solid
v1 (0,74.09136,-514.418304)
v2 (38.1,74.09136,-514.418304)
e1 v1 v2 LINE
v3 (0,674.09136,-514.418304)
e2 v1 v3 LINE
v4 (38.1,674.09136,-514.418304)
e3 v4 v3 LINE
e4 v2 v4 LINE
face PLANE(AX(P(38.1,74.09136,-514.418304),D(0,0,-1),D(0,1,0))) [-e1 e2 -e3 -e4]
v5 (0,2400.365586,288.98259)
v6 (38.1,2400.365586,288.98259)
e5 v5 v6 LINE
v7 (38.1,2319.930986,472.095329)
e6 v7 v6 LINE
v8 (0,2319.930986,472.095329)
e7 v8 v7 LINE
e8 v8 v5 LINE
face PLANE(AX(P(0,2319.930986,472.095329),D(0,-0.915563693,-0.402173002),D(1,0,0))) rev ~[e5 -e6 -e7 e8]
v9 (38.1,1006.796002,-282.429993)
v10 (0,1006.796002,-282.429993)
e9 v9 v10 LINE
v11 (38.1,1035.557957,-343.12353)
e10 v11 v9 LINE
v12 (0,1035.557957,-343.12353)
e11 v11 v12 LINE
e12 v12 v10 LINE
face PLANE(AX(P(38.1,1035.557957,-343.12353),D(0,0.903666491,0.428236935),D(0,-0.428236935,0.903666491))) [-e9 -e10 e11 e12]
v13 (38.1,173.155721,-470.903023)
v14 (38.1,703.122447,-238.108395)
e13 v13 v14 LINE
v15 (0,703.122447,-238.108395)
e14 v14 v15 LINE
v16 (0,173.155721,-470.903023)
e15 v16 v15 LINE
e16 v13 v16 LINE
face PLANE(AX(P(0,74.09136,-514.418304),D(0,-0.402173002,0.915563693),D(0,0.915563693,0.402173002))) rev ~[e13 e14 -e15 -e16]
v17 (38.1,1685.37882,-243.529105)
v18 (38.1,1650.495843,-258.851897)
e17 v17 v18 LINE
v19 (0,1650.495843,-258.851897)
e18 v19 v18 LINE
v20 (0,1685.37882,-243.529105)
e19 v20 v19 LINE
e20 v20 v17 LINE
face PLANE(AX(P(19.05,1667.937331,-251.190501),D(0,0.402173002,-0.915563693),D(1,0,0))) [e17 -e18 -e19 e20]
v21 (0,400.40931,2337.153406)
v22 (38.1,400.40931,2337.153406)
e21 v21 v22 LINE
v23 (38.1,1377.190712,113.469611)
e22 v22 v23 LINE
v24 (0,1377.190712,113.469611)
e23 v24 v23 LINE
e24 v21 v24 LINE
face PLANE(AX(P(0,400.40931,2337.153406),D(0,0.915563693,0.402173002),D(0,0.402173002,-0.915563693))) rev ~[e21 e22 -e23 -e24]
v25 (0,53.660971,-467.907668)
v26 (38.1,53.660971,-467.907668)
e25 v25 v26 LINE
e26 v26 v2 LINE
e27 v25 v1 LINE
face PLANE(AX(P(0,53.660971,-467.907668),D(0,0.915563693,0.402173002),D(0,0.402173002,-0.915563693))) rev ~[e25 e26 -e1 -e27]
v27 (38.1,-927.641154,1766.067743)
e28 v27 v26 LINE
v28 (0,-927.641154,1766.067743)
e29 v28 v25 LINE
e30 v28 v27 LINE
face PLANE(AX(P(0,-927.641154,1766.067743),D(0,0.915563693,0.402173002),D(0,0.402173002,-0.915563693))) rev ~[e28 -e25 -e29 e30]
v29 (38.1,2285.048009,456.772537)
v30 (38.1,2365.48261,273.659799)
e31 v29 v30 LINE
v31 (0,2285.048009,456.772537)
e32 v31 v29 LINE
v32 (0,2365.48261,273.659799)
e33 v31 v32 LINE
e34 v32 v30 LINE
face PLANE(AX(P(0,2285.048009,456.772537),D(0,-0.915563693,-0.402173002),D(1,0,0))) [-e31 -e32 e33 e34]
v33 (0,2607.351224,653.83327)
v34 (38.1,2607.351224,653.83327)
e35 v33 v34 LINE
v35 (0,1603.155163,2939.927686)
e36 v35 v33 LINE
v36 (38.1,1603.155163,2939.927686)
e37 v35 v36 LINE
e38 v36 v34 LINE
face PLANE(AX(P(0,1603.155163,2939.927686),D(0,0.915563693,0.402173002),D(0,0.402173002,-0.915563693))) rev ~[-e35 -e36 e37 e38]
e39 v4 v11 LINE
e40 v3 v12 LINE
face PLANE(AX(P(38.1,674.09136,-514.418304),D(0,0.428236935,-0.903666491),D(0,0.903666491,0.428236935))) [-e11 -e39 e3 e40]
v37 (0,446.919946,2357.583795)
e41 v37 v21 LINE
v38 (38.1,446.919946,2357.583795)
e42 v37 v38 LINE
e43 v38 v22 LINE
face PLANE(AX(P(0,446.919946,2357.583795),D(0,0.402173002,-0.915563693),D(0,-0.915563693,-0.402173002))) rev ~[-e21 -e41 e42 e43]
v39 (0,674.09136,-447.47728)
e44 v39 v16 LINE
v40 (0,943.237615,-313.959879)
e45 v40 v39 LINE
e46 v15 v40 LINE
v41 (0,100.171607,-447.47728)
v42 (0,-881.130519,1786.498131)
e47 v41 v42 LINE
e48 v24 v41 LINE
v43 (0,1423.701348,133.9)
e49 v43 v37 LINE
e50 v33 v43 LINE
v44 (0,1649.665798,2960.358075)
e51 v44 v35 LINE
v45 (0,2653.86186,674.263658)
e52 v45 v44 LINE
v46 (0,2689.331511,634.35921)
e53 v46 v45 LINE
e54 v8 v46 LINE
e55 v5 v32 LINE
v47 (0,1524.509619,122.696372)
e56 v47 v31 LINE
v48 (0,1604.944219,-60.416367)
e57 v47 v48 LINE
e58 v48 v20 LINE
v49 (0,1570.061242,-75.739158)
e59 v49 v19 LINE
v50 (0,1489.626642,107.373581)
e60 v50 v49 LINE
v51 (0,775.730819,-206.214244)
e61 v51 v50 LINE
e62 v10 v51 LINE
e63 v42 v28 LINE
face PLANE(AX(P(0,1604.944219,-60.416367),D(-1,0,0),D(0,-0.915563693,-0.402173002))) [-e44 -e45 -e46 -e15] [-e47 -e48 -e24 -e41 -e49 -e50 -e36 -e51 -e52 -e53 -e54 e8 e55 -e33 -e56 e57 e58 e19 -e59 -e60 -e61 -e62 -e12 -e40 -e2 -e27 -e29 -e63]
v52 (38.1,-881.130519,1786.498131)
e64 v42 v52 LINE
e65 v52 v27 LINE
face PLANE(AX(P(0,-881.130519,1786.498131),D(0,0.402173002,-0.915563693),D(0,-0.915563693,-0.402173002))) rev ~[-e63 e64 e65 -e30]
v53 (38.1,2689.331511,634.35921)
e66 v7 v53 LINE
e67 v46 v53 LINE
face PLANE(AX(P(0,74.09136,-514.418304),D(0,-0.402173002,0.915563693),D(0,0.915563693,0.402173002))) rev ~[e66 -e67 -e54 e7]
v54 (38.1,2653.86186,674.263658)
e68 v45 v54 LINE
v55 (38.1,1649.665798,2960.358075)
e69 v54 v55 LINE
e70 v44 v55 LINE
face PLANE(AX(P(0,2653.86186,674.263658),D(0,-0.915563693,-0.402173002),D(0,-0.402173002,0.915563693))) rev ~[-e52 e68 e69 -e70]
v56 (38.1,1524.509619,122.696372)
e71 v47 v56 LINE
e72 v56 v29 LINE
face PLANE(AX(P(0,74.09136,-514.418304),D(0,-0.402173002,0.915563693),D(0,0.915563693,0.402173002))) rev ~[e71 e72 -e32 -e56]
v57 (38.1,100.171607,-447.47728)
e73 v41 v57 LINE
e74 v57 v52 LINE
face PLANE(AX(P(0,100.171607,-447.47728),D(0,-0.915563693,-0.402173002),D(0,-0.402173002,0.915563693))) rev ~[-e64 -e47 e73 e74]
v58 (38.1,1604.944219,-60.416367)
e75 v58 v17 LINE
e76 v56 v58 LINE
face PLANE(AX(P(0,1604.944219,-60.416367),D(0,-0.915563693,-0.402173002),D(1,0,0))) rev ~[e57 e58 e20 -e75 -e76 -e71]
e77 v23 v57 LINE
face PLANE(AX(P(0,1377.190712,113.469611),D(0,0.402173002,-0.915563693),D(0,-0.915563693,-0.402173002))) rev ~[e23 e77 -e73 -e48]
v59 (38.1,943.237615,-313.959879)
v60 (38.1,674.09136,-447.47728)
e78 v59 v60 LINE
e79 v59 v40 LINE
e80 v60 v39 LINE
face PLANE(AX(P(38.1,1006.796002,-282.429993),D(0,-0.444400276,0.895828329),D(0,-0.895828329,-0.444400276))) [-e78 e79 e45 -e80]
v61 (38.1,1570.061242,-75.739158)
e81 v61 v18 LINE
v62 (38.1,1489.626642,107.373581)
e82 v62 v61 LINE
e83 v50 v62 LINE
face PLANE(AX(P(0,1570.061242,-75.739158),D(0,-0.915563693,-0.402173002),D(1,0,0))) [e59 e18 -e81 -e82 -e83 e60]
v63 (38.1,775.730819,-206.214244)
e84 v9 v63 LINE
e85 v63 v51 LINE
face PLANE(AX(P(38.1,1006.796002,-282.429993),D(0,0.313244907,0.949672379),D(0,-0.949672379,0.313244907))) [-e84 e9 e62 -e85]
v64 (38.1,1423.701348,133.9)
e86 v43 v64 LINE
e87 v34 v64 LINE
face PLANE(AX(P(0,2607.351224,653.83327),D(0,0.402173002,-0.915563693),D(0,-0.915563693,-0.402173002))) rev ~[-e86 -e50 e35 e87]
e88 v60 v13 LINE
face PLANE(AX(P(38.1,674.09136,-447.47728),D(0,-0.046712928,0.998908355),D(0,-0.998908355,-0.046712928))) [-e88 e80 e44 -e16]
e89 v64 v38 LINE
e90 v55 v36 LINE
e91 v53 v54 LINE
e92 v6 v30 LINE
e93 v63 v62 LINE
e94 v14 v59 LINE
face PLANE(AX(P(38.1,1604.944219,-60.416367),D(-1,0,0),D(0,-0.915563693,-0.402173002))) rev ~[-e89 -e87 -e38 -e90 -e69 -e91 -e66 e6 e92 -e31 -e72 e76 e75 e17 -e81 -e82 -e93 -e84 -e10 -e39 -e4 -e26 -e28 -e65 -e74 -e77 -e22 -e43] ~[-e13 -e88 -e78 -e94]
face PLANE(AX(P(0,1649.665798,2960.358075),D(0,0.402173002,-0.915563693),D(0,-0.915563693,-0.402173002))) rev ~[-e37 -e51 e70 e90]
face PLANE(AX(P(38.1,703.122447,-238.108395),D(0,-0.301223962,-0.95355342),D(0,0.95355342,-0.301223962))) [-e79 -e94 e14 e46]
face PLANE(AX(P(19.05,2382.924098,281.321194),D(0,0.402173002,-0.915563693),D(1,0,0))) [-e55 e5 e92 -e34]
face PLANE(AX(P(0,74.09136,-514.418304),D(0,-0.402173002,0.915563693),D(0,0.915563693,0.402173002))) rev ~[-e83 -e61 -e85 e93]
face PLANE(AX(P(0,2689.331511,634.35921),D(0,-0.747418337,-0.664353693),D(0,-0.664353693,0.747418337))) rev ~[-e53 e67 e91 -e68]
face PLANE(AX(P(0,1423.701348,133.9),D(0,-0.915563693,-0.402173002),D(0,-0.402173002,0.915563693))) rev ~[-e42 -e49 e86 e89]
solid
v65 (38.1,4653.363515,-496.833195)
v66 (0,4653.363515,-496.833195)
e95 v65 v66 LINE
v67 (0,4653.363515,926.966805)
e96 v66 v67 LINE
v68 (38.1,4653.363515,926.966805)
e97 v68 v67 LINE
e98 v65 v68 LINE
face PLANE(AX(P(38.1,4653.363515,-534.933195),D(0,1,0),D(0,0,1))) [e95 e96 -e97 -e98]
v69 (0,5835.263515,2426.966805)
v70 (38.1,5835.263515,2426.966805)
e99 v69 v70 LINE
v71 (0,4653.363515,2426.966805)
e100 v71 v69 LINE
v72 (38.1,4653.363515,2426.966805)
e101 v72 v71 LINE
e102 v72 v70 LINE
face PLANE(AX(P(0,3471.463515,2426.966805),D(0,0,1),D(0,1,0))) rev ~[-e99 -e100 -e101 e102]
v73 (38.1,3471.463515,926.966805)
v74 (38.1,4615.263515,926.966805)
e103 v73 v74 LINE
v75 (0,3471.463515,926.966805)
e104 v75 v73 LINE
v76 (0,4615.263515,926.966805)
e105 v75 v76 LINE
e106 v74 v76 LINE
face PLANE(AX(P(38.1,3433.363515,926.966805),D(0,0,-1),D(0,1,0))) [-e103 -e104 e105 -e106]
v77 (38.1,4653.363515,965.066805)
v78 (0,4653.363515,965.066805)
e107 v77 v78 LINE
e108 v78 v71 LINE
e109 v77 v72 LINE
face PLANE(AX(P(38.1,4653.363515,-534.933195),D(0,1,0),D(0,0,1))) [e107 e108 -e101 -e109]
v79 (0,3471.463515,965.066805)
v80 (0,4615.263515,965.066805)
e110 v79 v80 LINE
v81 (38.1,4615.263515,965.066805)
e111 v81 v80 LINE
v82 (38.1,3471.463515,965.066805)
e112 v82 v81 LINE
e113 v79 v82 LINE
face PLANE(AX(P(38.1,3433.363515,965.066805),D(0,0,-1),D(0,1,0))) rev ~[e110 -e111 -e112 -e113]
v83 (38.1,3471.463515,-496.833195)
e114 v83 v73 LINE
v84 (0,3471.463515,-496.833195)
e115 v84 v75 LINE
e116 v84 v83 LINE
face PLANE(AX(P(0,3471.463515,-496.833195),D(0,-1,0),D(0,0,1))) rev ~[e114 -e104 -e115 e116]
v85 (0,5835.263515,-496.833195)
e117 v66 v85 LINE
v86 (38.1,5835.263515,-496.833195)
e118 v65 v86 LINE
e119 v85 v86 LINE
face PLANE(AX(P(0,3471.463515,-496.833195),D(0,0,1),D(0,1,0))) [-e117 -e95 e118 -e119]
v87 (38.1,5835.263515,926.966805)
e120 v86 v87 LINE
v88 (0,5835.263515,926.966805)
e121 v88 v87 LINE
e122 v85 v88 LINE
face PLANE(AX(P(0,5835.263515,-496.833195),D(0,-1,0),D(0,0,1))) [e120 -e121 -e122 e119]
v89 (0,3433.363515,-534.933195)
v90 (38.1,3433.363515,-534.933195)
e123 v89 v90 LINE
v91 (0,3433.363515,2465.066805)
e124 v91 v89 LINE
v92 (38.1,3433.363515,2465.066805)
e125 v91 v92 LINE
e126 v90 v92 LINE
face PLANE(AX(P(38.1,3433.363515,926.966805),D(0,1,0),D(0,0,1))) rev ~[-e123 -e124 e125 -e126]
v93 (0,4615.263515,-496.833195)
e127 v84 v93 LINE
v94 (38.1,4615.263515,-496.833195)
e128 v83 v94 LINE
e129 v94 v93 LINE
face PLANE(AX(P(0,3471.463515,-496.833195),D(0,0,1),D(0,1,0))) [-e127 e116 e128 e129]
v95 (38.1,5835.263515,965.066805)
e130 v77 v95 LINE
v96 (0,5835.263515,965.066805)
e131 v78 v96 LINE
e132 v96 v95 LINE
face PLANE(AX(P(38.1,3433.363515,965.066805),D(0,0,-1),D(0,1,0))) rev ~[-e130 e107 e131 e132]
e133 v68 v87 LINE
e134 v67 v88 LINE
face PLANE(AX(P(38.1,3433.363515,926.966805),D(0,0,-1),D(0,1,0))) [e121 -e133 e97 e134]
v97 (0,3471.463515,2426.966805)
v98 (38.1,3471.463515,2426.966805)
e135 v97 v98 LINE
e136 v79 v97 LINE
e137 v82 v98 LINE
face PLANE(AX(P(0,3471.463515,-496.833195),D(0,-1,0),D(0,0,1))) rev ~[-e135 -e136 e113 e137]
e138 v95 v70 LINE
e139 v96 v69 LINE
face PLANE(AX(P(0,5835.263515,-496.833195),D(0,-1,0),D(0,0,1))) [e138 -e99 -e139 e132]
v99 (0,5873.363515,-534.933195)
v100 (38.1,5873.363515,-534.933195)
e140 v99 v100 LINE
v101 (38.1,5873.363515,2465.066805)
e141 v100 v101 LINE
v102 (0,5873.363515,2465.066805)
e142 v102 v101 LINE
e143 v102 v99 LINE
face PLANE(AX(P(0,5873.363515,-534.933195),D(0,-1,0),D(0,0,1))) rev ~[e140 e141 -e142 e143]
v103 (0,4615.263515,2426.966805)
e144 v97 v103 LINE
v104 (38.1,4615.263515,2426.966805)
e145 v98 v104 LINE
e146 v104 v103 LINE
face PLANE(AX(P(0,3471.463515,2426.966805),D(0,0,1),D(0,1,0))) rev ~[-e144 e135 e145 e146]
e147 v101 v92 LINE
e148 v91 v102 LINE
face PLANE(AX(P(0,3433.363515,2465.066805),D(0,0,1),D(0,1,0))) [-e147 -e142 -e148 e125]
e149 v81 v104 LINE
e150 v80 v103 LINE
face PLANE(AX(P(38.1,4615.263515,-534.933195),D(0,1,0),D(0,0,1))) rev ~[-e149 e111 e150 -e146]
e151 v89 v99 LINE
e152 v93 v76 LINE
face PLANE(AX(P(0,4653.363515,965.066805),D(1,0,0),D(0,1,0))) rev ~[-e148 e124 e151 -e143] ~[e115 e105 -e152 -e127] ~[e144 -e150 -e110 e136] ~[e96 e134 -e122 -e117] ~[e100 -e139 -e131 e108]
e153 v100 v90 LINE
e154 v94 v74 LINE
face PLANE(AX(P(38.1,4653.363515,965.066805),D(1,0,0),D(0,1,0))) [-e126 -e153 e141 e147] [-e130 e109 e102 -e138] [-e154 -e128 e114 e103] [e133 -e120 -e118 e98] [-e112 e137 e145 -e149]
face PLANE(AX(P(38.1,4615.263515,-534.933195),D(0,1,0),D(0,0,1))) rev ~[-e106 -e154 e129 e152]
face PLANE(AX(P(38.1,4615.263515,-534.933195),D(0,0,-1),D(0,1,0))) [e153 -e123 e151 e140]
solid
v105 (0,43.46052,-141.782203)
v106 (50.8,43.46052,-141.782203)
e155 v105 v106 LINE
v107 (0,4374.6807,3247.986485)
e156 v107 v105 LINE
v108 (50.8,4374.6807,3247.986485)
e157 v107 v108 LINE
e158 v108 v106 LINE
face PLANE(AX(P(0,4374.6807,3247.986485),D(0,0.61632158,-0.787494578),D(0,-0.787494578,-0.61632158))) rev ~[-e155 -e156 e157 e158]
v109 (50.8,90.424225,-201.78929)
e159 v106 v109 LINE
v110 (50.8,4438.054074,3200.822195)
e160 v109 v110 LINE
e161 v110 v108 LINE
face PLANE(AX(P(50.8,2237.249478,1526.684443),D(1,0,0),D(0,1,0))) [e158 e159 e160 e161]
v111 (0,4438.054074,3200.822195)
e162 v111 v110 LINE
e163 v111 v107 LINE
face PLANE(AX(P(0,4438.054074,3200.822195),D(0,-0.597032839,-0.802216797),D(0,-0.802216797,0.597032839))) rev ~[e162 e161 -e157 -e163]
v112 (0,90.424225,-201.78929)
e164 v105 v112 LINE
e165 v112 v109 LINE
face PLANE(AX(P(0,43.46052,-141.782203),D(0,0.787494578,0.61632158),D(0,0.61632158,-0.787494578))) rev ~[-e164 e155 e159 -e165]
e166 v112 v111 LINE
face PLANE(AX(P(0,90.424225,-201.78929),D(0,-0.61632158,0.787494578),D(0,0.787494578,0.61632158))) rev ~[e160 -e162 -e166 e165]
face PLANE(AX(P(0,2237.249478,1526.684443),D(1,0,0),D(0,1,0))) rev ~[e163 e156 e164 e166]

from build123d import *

# Parameters (mm, degrees)
F0_W      = 2440
F0_H      = 3000
F0_W_2    = 2363.8
F0_H_2    = 2923.8
F1_DEPTH  = 38.1
F2_W      = 38.1
F2_H      = 3000
F3_DEPTH  = 38.1
F4_W      = 2440
F4_H      = 38.1
F5_DEPTH  = 38.1
F7_DEPTH  = 38.1
F9_DEPTH  = 38.1
F10_DEPTH = 38.1
F11_W     = 38.1
F11_H     = 38.1
F12_DEPTH = 200
F13_W     = 38.1
F13_H     = 38.1
F14_DEPTH = 200
F16_DEPTH = 50.8


# Not quite as in the source:
# - a feature names something its author has since deleted; it is built from what else it names


with BuildPart() as f1:
    # F0 (on Right) → F1 (new body)
    with BuildSketch(Plane.YZ):
        with Locations((4653.3635152385, 965.0668048064)):
            Rectangle(F0_W, F0_H)
        with Locations((4653.3635152385, 965.0668048064)):
            Rectangle(F0_W_2, F0_H_2, mode=Mode.SUBTRACT)
    extrude(amount=F1_DEPTH)

    # F2 (on face) → F3 (join)
    with BuildSketch(Plane.YZ.offset(38.1)):
        with Locations((4634.3135152385, 965.0668048064)):
            Rectangle(F2_W, F2_H)
    extrude(amount=-F3_DEPTH)

    # F4 (on face) → F5 (join)
    with BuildSketch(Plane.YZ.offset(38.1)):
        with Locations((4653.3635152385, 946.0168048064)):
            Rectangle(F4_W, F4_H)
    extrude(amount=-F5_DEPTH)


with BuildPart() as f7:
    # F6 (on Right) → F7 (new body)
    with BuildSketch(Plane.YZ):
        Polygon((74.091359973, -514.4183039665), (2689.3315110135, 634.3592099591), (2653.8618600197, 674.2636581614), (2607.3512244074, 653.8332696449), (1423.7013476008, 133.8999999239), (1377.1907119885, 113.4696114073), (100.1716070687, -447.4772798376), (109.1459151908, -467.9076683542), align=None)
        Polygon((53.6609714564, -467.9076683542), (74.091359973, -514.4183039665), (109.1459151908, -467.9076683542), (100.1716070687, -447.4772798376), align=None)
        Polygon((2607.3512244074, 653.8332696449), (2653.8618600197, 674.2636581614), (1649.6657982272, 2960.358074601), (1603.1551626149, 2939.9276860845), align=None)
        Polygon((-927.6411541415, 1766.0677429467), (53.6609714564, -467.9076683542), (100.1716070687, -447.4772798376), (-881.1305185292, 1786.4981314632), align=None)
        Polygon((1377.1907119885, 113.4696114073), (1423.7013476008, 133.8999999239), (446.9199455077, 2357.5837947211), (400.4093098953, 2337.1534062045), align=None)
    extrude(amount=F7_DEPTH)

    # F8 (on face) → F9 (join)
    with BuildSketch(Plane.YZ.offset(38.1)):
        Polygon((943.2376147162, -313.9598791054), (1035.5579565697, -343.1235301269), (1006.796002388, -282.4299931526), align=None)
        Polygon((173.1557213069, -470.9030227077), (74.091359973, -514.4183039665), (674.091359973, -514.4183039665), (674.091359973, -447.4772798376), align=None)
        Polygon((674.091359973, -447.4772798376), (674.091359973, -514.4183039665), (1035.5579565697, -343.1235301269), (943.2376147162, -313.9598791054), align=None)
    extrude(amount=-F9_DEPTH)

    # F8 (on face) → F10 (join)
    with BuildSketch(Plane.YZ.offset(38.1)):
        Polygon((674.091359973, -447.4772798376), (674.091359973, -514.4183039665), (1035.5579565697, -343.1235301269), (943.2376147162, -313.9598791054), align=None)
        Polygon((943.2376147162, -313.9598791054), (1035.5579565697, -343.1235301269), (1006.796002388, -282.4299931526), align=None)
        Polygon((703.1224470539, -238.1083948703), (943.2376147162, -313.9598791054), (1006.796002388, -282.4299931526), (775.7308186411, -206.2142437466), align=None)
    extrude(amount=-F10_DEPTH)

    # F11 (on face) → F12 (join)
    with BuildSketch(Plane(origin=(0, 201.4003034253, -458.4962306145), x_dir=(1, 0, 0), z_dir=(0, 0.4021730023, -0.9155636932))):
        with Locations((19.05, -1426.0808250427)):
            Rectangle(F11_W, F11_H)
        with Locations((19.05, -2294.8585769653)):
            Rectangle(F11_W, F11_H)
    extrude(amount=F12_DEPTH)

    # F13 (on face) → F14 (join)
    with BuildSketch(Plane(origin=(0, 281.8349038841, -641.6089692457), x_dir=(1, 0, 0), z_dir=(0, 0.4021730023, -0.9155636932))):
        with Locations((19.05, -1426.0808250427)):
            Rectangle(F13_W, F13_H)
    extrude(amount=F14_DEPTH)


with BuildPart() as f16:
    # F15 (on Right) → F16 (new body)
    with BuildSketch(Plane.YZ):
        Polygon((90.4242247343, -201.7892897129), (4438.0540736265, 3200.8221953591), (4374.6806999502, 3247.9864848224), (43.4605203704, -141.7822028613), align=None)
    extrude(amount=F16_DEPTH)


solid = Compound([f1.part, f7.part, f16.part])
